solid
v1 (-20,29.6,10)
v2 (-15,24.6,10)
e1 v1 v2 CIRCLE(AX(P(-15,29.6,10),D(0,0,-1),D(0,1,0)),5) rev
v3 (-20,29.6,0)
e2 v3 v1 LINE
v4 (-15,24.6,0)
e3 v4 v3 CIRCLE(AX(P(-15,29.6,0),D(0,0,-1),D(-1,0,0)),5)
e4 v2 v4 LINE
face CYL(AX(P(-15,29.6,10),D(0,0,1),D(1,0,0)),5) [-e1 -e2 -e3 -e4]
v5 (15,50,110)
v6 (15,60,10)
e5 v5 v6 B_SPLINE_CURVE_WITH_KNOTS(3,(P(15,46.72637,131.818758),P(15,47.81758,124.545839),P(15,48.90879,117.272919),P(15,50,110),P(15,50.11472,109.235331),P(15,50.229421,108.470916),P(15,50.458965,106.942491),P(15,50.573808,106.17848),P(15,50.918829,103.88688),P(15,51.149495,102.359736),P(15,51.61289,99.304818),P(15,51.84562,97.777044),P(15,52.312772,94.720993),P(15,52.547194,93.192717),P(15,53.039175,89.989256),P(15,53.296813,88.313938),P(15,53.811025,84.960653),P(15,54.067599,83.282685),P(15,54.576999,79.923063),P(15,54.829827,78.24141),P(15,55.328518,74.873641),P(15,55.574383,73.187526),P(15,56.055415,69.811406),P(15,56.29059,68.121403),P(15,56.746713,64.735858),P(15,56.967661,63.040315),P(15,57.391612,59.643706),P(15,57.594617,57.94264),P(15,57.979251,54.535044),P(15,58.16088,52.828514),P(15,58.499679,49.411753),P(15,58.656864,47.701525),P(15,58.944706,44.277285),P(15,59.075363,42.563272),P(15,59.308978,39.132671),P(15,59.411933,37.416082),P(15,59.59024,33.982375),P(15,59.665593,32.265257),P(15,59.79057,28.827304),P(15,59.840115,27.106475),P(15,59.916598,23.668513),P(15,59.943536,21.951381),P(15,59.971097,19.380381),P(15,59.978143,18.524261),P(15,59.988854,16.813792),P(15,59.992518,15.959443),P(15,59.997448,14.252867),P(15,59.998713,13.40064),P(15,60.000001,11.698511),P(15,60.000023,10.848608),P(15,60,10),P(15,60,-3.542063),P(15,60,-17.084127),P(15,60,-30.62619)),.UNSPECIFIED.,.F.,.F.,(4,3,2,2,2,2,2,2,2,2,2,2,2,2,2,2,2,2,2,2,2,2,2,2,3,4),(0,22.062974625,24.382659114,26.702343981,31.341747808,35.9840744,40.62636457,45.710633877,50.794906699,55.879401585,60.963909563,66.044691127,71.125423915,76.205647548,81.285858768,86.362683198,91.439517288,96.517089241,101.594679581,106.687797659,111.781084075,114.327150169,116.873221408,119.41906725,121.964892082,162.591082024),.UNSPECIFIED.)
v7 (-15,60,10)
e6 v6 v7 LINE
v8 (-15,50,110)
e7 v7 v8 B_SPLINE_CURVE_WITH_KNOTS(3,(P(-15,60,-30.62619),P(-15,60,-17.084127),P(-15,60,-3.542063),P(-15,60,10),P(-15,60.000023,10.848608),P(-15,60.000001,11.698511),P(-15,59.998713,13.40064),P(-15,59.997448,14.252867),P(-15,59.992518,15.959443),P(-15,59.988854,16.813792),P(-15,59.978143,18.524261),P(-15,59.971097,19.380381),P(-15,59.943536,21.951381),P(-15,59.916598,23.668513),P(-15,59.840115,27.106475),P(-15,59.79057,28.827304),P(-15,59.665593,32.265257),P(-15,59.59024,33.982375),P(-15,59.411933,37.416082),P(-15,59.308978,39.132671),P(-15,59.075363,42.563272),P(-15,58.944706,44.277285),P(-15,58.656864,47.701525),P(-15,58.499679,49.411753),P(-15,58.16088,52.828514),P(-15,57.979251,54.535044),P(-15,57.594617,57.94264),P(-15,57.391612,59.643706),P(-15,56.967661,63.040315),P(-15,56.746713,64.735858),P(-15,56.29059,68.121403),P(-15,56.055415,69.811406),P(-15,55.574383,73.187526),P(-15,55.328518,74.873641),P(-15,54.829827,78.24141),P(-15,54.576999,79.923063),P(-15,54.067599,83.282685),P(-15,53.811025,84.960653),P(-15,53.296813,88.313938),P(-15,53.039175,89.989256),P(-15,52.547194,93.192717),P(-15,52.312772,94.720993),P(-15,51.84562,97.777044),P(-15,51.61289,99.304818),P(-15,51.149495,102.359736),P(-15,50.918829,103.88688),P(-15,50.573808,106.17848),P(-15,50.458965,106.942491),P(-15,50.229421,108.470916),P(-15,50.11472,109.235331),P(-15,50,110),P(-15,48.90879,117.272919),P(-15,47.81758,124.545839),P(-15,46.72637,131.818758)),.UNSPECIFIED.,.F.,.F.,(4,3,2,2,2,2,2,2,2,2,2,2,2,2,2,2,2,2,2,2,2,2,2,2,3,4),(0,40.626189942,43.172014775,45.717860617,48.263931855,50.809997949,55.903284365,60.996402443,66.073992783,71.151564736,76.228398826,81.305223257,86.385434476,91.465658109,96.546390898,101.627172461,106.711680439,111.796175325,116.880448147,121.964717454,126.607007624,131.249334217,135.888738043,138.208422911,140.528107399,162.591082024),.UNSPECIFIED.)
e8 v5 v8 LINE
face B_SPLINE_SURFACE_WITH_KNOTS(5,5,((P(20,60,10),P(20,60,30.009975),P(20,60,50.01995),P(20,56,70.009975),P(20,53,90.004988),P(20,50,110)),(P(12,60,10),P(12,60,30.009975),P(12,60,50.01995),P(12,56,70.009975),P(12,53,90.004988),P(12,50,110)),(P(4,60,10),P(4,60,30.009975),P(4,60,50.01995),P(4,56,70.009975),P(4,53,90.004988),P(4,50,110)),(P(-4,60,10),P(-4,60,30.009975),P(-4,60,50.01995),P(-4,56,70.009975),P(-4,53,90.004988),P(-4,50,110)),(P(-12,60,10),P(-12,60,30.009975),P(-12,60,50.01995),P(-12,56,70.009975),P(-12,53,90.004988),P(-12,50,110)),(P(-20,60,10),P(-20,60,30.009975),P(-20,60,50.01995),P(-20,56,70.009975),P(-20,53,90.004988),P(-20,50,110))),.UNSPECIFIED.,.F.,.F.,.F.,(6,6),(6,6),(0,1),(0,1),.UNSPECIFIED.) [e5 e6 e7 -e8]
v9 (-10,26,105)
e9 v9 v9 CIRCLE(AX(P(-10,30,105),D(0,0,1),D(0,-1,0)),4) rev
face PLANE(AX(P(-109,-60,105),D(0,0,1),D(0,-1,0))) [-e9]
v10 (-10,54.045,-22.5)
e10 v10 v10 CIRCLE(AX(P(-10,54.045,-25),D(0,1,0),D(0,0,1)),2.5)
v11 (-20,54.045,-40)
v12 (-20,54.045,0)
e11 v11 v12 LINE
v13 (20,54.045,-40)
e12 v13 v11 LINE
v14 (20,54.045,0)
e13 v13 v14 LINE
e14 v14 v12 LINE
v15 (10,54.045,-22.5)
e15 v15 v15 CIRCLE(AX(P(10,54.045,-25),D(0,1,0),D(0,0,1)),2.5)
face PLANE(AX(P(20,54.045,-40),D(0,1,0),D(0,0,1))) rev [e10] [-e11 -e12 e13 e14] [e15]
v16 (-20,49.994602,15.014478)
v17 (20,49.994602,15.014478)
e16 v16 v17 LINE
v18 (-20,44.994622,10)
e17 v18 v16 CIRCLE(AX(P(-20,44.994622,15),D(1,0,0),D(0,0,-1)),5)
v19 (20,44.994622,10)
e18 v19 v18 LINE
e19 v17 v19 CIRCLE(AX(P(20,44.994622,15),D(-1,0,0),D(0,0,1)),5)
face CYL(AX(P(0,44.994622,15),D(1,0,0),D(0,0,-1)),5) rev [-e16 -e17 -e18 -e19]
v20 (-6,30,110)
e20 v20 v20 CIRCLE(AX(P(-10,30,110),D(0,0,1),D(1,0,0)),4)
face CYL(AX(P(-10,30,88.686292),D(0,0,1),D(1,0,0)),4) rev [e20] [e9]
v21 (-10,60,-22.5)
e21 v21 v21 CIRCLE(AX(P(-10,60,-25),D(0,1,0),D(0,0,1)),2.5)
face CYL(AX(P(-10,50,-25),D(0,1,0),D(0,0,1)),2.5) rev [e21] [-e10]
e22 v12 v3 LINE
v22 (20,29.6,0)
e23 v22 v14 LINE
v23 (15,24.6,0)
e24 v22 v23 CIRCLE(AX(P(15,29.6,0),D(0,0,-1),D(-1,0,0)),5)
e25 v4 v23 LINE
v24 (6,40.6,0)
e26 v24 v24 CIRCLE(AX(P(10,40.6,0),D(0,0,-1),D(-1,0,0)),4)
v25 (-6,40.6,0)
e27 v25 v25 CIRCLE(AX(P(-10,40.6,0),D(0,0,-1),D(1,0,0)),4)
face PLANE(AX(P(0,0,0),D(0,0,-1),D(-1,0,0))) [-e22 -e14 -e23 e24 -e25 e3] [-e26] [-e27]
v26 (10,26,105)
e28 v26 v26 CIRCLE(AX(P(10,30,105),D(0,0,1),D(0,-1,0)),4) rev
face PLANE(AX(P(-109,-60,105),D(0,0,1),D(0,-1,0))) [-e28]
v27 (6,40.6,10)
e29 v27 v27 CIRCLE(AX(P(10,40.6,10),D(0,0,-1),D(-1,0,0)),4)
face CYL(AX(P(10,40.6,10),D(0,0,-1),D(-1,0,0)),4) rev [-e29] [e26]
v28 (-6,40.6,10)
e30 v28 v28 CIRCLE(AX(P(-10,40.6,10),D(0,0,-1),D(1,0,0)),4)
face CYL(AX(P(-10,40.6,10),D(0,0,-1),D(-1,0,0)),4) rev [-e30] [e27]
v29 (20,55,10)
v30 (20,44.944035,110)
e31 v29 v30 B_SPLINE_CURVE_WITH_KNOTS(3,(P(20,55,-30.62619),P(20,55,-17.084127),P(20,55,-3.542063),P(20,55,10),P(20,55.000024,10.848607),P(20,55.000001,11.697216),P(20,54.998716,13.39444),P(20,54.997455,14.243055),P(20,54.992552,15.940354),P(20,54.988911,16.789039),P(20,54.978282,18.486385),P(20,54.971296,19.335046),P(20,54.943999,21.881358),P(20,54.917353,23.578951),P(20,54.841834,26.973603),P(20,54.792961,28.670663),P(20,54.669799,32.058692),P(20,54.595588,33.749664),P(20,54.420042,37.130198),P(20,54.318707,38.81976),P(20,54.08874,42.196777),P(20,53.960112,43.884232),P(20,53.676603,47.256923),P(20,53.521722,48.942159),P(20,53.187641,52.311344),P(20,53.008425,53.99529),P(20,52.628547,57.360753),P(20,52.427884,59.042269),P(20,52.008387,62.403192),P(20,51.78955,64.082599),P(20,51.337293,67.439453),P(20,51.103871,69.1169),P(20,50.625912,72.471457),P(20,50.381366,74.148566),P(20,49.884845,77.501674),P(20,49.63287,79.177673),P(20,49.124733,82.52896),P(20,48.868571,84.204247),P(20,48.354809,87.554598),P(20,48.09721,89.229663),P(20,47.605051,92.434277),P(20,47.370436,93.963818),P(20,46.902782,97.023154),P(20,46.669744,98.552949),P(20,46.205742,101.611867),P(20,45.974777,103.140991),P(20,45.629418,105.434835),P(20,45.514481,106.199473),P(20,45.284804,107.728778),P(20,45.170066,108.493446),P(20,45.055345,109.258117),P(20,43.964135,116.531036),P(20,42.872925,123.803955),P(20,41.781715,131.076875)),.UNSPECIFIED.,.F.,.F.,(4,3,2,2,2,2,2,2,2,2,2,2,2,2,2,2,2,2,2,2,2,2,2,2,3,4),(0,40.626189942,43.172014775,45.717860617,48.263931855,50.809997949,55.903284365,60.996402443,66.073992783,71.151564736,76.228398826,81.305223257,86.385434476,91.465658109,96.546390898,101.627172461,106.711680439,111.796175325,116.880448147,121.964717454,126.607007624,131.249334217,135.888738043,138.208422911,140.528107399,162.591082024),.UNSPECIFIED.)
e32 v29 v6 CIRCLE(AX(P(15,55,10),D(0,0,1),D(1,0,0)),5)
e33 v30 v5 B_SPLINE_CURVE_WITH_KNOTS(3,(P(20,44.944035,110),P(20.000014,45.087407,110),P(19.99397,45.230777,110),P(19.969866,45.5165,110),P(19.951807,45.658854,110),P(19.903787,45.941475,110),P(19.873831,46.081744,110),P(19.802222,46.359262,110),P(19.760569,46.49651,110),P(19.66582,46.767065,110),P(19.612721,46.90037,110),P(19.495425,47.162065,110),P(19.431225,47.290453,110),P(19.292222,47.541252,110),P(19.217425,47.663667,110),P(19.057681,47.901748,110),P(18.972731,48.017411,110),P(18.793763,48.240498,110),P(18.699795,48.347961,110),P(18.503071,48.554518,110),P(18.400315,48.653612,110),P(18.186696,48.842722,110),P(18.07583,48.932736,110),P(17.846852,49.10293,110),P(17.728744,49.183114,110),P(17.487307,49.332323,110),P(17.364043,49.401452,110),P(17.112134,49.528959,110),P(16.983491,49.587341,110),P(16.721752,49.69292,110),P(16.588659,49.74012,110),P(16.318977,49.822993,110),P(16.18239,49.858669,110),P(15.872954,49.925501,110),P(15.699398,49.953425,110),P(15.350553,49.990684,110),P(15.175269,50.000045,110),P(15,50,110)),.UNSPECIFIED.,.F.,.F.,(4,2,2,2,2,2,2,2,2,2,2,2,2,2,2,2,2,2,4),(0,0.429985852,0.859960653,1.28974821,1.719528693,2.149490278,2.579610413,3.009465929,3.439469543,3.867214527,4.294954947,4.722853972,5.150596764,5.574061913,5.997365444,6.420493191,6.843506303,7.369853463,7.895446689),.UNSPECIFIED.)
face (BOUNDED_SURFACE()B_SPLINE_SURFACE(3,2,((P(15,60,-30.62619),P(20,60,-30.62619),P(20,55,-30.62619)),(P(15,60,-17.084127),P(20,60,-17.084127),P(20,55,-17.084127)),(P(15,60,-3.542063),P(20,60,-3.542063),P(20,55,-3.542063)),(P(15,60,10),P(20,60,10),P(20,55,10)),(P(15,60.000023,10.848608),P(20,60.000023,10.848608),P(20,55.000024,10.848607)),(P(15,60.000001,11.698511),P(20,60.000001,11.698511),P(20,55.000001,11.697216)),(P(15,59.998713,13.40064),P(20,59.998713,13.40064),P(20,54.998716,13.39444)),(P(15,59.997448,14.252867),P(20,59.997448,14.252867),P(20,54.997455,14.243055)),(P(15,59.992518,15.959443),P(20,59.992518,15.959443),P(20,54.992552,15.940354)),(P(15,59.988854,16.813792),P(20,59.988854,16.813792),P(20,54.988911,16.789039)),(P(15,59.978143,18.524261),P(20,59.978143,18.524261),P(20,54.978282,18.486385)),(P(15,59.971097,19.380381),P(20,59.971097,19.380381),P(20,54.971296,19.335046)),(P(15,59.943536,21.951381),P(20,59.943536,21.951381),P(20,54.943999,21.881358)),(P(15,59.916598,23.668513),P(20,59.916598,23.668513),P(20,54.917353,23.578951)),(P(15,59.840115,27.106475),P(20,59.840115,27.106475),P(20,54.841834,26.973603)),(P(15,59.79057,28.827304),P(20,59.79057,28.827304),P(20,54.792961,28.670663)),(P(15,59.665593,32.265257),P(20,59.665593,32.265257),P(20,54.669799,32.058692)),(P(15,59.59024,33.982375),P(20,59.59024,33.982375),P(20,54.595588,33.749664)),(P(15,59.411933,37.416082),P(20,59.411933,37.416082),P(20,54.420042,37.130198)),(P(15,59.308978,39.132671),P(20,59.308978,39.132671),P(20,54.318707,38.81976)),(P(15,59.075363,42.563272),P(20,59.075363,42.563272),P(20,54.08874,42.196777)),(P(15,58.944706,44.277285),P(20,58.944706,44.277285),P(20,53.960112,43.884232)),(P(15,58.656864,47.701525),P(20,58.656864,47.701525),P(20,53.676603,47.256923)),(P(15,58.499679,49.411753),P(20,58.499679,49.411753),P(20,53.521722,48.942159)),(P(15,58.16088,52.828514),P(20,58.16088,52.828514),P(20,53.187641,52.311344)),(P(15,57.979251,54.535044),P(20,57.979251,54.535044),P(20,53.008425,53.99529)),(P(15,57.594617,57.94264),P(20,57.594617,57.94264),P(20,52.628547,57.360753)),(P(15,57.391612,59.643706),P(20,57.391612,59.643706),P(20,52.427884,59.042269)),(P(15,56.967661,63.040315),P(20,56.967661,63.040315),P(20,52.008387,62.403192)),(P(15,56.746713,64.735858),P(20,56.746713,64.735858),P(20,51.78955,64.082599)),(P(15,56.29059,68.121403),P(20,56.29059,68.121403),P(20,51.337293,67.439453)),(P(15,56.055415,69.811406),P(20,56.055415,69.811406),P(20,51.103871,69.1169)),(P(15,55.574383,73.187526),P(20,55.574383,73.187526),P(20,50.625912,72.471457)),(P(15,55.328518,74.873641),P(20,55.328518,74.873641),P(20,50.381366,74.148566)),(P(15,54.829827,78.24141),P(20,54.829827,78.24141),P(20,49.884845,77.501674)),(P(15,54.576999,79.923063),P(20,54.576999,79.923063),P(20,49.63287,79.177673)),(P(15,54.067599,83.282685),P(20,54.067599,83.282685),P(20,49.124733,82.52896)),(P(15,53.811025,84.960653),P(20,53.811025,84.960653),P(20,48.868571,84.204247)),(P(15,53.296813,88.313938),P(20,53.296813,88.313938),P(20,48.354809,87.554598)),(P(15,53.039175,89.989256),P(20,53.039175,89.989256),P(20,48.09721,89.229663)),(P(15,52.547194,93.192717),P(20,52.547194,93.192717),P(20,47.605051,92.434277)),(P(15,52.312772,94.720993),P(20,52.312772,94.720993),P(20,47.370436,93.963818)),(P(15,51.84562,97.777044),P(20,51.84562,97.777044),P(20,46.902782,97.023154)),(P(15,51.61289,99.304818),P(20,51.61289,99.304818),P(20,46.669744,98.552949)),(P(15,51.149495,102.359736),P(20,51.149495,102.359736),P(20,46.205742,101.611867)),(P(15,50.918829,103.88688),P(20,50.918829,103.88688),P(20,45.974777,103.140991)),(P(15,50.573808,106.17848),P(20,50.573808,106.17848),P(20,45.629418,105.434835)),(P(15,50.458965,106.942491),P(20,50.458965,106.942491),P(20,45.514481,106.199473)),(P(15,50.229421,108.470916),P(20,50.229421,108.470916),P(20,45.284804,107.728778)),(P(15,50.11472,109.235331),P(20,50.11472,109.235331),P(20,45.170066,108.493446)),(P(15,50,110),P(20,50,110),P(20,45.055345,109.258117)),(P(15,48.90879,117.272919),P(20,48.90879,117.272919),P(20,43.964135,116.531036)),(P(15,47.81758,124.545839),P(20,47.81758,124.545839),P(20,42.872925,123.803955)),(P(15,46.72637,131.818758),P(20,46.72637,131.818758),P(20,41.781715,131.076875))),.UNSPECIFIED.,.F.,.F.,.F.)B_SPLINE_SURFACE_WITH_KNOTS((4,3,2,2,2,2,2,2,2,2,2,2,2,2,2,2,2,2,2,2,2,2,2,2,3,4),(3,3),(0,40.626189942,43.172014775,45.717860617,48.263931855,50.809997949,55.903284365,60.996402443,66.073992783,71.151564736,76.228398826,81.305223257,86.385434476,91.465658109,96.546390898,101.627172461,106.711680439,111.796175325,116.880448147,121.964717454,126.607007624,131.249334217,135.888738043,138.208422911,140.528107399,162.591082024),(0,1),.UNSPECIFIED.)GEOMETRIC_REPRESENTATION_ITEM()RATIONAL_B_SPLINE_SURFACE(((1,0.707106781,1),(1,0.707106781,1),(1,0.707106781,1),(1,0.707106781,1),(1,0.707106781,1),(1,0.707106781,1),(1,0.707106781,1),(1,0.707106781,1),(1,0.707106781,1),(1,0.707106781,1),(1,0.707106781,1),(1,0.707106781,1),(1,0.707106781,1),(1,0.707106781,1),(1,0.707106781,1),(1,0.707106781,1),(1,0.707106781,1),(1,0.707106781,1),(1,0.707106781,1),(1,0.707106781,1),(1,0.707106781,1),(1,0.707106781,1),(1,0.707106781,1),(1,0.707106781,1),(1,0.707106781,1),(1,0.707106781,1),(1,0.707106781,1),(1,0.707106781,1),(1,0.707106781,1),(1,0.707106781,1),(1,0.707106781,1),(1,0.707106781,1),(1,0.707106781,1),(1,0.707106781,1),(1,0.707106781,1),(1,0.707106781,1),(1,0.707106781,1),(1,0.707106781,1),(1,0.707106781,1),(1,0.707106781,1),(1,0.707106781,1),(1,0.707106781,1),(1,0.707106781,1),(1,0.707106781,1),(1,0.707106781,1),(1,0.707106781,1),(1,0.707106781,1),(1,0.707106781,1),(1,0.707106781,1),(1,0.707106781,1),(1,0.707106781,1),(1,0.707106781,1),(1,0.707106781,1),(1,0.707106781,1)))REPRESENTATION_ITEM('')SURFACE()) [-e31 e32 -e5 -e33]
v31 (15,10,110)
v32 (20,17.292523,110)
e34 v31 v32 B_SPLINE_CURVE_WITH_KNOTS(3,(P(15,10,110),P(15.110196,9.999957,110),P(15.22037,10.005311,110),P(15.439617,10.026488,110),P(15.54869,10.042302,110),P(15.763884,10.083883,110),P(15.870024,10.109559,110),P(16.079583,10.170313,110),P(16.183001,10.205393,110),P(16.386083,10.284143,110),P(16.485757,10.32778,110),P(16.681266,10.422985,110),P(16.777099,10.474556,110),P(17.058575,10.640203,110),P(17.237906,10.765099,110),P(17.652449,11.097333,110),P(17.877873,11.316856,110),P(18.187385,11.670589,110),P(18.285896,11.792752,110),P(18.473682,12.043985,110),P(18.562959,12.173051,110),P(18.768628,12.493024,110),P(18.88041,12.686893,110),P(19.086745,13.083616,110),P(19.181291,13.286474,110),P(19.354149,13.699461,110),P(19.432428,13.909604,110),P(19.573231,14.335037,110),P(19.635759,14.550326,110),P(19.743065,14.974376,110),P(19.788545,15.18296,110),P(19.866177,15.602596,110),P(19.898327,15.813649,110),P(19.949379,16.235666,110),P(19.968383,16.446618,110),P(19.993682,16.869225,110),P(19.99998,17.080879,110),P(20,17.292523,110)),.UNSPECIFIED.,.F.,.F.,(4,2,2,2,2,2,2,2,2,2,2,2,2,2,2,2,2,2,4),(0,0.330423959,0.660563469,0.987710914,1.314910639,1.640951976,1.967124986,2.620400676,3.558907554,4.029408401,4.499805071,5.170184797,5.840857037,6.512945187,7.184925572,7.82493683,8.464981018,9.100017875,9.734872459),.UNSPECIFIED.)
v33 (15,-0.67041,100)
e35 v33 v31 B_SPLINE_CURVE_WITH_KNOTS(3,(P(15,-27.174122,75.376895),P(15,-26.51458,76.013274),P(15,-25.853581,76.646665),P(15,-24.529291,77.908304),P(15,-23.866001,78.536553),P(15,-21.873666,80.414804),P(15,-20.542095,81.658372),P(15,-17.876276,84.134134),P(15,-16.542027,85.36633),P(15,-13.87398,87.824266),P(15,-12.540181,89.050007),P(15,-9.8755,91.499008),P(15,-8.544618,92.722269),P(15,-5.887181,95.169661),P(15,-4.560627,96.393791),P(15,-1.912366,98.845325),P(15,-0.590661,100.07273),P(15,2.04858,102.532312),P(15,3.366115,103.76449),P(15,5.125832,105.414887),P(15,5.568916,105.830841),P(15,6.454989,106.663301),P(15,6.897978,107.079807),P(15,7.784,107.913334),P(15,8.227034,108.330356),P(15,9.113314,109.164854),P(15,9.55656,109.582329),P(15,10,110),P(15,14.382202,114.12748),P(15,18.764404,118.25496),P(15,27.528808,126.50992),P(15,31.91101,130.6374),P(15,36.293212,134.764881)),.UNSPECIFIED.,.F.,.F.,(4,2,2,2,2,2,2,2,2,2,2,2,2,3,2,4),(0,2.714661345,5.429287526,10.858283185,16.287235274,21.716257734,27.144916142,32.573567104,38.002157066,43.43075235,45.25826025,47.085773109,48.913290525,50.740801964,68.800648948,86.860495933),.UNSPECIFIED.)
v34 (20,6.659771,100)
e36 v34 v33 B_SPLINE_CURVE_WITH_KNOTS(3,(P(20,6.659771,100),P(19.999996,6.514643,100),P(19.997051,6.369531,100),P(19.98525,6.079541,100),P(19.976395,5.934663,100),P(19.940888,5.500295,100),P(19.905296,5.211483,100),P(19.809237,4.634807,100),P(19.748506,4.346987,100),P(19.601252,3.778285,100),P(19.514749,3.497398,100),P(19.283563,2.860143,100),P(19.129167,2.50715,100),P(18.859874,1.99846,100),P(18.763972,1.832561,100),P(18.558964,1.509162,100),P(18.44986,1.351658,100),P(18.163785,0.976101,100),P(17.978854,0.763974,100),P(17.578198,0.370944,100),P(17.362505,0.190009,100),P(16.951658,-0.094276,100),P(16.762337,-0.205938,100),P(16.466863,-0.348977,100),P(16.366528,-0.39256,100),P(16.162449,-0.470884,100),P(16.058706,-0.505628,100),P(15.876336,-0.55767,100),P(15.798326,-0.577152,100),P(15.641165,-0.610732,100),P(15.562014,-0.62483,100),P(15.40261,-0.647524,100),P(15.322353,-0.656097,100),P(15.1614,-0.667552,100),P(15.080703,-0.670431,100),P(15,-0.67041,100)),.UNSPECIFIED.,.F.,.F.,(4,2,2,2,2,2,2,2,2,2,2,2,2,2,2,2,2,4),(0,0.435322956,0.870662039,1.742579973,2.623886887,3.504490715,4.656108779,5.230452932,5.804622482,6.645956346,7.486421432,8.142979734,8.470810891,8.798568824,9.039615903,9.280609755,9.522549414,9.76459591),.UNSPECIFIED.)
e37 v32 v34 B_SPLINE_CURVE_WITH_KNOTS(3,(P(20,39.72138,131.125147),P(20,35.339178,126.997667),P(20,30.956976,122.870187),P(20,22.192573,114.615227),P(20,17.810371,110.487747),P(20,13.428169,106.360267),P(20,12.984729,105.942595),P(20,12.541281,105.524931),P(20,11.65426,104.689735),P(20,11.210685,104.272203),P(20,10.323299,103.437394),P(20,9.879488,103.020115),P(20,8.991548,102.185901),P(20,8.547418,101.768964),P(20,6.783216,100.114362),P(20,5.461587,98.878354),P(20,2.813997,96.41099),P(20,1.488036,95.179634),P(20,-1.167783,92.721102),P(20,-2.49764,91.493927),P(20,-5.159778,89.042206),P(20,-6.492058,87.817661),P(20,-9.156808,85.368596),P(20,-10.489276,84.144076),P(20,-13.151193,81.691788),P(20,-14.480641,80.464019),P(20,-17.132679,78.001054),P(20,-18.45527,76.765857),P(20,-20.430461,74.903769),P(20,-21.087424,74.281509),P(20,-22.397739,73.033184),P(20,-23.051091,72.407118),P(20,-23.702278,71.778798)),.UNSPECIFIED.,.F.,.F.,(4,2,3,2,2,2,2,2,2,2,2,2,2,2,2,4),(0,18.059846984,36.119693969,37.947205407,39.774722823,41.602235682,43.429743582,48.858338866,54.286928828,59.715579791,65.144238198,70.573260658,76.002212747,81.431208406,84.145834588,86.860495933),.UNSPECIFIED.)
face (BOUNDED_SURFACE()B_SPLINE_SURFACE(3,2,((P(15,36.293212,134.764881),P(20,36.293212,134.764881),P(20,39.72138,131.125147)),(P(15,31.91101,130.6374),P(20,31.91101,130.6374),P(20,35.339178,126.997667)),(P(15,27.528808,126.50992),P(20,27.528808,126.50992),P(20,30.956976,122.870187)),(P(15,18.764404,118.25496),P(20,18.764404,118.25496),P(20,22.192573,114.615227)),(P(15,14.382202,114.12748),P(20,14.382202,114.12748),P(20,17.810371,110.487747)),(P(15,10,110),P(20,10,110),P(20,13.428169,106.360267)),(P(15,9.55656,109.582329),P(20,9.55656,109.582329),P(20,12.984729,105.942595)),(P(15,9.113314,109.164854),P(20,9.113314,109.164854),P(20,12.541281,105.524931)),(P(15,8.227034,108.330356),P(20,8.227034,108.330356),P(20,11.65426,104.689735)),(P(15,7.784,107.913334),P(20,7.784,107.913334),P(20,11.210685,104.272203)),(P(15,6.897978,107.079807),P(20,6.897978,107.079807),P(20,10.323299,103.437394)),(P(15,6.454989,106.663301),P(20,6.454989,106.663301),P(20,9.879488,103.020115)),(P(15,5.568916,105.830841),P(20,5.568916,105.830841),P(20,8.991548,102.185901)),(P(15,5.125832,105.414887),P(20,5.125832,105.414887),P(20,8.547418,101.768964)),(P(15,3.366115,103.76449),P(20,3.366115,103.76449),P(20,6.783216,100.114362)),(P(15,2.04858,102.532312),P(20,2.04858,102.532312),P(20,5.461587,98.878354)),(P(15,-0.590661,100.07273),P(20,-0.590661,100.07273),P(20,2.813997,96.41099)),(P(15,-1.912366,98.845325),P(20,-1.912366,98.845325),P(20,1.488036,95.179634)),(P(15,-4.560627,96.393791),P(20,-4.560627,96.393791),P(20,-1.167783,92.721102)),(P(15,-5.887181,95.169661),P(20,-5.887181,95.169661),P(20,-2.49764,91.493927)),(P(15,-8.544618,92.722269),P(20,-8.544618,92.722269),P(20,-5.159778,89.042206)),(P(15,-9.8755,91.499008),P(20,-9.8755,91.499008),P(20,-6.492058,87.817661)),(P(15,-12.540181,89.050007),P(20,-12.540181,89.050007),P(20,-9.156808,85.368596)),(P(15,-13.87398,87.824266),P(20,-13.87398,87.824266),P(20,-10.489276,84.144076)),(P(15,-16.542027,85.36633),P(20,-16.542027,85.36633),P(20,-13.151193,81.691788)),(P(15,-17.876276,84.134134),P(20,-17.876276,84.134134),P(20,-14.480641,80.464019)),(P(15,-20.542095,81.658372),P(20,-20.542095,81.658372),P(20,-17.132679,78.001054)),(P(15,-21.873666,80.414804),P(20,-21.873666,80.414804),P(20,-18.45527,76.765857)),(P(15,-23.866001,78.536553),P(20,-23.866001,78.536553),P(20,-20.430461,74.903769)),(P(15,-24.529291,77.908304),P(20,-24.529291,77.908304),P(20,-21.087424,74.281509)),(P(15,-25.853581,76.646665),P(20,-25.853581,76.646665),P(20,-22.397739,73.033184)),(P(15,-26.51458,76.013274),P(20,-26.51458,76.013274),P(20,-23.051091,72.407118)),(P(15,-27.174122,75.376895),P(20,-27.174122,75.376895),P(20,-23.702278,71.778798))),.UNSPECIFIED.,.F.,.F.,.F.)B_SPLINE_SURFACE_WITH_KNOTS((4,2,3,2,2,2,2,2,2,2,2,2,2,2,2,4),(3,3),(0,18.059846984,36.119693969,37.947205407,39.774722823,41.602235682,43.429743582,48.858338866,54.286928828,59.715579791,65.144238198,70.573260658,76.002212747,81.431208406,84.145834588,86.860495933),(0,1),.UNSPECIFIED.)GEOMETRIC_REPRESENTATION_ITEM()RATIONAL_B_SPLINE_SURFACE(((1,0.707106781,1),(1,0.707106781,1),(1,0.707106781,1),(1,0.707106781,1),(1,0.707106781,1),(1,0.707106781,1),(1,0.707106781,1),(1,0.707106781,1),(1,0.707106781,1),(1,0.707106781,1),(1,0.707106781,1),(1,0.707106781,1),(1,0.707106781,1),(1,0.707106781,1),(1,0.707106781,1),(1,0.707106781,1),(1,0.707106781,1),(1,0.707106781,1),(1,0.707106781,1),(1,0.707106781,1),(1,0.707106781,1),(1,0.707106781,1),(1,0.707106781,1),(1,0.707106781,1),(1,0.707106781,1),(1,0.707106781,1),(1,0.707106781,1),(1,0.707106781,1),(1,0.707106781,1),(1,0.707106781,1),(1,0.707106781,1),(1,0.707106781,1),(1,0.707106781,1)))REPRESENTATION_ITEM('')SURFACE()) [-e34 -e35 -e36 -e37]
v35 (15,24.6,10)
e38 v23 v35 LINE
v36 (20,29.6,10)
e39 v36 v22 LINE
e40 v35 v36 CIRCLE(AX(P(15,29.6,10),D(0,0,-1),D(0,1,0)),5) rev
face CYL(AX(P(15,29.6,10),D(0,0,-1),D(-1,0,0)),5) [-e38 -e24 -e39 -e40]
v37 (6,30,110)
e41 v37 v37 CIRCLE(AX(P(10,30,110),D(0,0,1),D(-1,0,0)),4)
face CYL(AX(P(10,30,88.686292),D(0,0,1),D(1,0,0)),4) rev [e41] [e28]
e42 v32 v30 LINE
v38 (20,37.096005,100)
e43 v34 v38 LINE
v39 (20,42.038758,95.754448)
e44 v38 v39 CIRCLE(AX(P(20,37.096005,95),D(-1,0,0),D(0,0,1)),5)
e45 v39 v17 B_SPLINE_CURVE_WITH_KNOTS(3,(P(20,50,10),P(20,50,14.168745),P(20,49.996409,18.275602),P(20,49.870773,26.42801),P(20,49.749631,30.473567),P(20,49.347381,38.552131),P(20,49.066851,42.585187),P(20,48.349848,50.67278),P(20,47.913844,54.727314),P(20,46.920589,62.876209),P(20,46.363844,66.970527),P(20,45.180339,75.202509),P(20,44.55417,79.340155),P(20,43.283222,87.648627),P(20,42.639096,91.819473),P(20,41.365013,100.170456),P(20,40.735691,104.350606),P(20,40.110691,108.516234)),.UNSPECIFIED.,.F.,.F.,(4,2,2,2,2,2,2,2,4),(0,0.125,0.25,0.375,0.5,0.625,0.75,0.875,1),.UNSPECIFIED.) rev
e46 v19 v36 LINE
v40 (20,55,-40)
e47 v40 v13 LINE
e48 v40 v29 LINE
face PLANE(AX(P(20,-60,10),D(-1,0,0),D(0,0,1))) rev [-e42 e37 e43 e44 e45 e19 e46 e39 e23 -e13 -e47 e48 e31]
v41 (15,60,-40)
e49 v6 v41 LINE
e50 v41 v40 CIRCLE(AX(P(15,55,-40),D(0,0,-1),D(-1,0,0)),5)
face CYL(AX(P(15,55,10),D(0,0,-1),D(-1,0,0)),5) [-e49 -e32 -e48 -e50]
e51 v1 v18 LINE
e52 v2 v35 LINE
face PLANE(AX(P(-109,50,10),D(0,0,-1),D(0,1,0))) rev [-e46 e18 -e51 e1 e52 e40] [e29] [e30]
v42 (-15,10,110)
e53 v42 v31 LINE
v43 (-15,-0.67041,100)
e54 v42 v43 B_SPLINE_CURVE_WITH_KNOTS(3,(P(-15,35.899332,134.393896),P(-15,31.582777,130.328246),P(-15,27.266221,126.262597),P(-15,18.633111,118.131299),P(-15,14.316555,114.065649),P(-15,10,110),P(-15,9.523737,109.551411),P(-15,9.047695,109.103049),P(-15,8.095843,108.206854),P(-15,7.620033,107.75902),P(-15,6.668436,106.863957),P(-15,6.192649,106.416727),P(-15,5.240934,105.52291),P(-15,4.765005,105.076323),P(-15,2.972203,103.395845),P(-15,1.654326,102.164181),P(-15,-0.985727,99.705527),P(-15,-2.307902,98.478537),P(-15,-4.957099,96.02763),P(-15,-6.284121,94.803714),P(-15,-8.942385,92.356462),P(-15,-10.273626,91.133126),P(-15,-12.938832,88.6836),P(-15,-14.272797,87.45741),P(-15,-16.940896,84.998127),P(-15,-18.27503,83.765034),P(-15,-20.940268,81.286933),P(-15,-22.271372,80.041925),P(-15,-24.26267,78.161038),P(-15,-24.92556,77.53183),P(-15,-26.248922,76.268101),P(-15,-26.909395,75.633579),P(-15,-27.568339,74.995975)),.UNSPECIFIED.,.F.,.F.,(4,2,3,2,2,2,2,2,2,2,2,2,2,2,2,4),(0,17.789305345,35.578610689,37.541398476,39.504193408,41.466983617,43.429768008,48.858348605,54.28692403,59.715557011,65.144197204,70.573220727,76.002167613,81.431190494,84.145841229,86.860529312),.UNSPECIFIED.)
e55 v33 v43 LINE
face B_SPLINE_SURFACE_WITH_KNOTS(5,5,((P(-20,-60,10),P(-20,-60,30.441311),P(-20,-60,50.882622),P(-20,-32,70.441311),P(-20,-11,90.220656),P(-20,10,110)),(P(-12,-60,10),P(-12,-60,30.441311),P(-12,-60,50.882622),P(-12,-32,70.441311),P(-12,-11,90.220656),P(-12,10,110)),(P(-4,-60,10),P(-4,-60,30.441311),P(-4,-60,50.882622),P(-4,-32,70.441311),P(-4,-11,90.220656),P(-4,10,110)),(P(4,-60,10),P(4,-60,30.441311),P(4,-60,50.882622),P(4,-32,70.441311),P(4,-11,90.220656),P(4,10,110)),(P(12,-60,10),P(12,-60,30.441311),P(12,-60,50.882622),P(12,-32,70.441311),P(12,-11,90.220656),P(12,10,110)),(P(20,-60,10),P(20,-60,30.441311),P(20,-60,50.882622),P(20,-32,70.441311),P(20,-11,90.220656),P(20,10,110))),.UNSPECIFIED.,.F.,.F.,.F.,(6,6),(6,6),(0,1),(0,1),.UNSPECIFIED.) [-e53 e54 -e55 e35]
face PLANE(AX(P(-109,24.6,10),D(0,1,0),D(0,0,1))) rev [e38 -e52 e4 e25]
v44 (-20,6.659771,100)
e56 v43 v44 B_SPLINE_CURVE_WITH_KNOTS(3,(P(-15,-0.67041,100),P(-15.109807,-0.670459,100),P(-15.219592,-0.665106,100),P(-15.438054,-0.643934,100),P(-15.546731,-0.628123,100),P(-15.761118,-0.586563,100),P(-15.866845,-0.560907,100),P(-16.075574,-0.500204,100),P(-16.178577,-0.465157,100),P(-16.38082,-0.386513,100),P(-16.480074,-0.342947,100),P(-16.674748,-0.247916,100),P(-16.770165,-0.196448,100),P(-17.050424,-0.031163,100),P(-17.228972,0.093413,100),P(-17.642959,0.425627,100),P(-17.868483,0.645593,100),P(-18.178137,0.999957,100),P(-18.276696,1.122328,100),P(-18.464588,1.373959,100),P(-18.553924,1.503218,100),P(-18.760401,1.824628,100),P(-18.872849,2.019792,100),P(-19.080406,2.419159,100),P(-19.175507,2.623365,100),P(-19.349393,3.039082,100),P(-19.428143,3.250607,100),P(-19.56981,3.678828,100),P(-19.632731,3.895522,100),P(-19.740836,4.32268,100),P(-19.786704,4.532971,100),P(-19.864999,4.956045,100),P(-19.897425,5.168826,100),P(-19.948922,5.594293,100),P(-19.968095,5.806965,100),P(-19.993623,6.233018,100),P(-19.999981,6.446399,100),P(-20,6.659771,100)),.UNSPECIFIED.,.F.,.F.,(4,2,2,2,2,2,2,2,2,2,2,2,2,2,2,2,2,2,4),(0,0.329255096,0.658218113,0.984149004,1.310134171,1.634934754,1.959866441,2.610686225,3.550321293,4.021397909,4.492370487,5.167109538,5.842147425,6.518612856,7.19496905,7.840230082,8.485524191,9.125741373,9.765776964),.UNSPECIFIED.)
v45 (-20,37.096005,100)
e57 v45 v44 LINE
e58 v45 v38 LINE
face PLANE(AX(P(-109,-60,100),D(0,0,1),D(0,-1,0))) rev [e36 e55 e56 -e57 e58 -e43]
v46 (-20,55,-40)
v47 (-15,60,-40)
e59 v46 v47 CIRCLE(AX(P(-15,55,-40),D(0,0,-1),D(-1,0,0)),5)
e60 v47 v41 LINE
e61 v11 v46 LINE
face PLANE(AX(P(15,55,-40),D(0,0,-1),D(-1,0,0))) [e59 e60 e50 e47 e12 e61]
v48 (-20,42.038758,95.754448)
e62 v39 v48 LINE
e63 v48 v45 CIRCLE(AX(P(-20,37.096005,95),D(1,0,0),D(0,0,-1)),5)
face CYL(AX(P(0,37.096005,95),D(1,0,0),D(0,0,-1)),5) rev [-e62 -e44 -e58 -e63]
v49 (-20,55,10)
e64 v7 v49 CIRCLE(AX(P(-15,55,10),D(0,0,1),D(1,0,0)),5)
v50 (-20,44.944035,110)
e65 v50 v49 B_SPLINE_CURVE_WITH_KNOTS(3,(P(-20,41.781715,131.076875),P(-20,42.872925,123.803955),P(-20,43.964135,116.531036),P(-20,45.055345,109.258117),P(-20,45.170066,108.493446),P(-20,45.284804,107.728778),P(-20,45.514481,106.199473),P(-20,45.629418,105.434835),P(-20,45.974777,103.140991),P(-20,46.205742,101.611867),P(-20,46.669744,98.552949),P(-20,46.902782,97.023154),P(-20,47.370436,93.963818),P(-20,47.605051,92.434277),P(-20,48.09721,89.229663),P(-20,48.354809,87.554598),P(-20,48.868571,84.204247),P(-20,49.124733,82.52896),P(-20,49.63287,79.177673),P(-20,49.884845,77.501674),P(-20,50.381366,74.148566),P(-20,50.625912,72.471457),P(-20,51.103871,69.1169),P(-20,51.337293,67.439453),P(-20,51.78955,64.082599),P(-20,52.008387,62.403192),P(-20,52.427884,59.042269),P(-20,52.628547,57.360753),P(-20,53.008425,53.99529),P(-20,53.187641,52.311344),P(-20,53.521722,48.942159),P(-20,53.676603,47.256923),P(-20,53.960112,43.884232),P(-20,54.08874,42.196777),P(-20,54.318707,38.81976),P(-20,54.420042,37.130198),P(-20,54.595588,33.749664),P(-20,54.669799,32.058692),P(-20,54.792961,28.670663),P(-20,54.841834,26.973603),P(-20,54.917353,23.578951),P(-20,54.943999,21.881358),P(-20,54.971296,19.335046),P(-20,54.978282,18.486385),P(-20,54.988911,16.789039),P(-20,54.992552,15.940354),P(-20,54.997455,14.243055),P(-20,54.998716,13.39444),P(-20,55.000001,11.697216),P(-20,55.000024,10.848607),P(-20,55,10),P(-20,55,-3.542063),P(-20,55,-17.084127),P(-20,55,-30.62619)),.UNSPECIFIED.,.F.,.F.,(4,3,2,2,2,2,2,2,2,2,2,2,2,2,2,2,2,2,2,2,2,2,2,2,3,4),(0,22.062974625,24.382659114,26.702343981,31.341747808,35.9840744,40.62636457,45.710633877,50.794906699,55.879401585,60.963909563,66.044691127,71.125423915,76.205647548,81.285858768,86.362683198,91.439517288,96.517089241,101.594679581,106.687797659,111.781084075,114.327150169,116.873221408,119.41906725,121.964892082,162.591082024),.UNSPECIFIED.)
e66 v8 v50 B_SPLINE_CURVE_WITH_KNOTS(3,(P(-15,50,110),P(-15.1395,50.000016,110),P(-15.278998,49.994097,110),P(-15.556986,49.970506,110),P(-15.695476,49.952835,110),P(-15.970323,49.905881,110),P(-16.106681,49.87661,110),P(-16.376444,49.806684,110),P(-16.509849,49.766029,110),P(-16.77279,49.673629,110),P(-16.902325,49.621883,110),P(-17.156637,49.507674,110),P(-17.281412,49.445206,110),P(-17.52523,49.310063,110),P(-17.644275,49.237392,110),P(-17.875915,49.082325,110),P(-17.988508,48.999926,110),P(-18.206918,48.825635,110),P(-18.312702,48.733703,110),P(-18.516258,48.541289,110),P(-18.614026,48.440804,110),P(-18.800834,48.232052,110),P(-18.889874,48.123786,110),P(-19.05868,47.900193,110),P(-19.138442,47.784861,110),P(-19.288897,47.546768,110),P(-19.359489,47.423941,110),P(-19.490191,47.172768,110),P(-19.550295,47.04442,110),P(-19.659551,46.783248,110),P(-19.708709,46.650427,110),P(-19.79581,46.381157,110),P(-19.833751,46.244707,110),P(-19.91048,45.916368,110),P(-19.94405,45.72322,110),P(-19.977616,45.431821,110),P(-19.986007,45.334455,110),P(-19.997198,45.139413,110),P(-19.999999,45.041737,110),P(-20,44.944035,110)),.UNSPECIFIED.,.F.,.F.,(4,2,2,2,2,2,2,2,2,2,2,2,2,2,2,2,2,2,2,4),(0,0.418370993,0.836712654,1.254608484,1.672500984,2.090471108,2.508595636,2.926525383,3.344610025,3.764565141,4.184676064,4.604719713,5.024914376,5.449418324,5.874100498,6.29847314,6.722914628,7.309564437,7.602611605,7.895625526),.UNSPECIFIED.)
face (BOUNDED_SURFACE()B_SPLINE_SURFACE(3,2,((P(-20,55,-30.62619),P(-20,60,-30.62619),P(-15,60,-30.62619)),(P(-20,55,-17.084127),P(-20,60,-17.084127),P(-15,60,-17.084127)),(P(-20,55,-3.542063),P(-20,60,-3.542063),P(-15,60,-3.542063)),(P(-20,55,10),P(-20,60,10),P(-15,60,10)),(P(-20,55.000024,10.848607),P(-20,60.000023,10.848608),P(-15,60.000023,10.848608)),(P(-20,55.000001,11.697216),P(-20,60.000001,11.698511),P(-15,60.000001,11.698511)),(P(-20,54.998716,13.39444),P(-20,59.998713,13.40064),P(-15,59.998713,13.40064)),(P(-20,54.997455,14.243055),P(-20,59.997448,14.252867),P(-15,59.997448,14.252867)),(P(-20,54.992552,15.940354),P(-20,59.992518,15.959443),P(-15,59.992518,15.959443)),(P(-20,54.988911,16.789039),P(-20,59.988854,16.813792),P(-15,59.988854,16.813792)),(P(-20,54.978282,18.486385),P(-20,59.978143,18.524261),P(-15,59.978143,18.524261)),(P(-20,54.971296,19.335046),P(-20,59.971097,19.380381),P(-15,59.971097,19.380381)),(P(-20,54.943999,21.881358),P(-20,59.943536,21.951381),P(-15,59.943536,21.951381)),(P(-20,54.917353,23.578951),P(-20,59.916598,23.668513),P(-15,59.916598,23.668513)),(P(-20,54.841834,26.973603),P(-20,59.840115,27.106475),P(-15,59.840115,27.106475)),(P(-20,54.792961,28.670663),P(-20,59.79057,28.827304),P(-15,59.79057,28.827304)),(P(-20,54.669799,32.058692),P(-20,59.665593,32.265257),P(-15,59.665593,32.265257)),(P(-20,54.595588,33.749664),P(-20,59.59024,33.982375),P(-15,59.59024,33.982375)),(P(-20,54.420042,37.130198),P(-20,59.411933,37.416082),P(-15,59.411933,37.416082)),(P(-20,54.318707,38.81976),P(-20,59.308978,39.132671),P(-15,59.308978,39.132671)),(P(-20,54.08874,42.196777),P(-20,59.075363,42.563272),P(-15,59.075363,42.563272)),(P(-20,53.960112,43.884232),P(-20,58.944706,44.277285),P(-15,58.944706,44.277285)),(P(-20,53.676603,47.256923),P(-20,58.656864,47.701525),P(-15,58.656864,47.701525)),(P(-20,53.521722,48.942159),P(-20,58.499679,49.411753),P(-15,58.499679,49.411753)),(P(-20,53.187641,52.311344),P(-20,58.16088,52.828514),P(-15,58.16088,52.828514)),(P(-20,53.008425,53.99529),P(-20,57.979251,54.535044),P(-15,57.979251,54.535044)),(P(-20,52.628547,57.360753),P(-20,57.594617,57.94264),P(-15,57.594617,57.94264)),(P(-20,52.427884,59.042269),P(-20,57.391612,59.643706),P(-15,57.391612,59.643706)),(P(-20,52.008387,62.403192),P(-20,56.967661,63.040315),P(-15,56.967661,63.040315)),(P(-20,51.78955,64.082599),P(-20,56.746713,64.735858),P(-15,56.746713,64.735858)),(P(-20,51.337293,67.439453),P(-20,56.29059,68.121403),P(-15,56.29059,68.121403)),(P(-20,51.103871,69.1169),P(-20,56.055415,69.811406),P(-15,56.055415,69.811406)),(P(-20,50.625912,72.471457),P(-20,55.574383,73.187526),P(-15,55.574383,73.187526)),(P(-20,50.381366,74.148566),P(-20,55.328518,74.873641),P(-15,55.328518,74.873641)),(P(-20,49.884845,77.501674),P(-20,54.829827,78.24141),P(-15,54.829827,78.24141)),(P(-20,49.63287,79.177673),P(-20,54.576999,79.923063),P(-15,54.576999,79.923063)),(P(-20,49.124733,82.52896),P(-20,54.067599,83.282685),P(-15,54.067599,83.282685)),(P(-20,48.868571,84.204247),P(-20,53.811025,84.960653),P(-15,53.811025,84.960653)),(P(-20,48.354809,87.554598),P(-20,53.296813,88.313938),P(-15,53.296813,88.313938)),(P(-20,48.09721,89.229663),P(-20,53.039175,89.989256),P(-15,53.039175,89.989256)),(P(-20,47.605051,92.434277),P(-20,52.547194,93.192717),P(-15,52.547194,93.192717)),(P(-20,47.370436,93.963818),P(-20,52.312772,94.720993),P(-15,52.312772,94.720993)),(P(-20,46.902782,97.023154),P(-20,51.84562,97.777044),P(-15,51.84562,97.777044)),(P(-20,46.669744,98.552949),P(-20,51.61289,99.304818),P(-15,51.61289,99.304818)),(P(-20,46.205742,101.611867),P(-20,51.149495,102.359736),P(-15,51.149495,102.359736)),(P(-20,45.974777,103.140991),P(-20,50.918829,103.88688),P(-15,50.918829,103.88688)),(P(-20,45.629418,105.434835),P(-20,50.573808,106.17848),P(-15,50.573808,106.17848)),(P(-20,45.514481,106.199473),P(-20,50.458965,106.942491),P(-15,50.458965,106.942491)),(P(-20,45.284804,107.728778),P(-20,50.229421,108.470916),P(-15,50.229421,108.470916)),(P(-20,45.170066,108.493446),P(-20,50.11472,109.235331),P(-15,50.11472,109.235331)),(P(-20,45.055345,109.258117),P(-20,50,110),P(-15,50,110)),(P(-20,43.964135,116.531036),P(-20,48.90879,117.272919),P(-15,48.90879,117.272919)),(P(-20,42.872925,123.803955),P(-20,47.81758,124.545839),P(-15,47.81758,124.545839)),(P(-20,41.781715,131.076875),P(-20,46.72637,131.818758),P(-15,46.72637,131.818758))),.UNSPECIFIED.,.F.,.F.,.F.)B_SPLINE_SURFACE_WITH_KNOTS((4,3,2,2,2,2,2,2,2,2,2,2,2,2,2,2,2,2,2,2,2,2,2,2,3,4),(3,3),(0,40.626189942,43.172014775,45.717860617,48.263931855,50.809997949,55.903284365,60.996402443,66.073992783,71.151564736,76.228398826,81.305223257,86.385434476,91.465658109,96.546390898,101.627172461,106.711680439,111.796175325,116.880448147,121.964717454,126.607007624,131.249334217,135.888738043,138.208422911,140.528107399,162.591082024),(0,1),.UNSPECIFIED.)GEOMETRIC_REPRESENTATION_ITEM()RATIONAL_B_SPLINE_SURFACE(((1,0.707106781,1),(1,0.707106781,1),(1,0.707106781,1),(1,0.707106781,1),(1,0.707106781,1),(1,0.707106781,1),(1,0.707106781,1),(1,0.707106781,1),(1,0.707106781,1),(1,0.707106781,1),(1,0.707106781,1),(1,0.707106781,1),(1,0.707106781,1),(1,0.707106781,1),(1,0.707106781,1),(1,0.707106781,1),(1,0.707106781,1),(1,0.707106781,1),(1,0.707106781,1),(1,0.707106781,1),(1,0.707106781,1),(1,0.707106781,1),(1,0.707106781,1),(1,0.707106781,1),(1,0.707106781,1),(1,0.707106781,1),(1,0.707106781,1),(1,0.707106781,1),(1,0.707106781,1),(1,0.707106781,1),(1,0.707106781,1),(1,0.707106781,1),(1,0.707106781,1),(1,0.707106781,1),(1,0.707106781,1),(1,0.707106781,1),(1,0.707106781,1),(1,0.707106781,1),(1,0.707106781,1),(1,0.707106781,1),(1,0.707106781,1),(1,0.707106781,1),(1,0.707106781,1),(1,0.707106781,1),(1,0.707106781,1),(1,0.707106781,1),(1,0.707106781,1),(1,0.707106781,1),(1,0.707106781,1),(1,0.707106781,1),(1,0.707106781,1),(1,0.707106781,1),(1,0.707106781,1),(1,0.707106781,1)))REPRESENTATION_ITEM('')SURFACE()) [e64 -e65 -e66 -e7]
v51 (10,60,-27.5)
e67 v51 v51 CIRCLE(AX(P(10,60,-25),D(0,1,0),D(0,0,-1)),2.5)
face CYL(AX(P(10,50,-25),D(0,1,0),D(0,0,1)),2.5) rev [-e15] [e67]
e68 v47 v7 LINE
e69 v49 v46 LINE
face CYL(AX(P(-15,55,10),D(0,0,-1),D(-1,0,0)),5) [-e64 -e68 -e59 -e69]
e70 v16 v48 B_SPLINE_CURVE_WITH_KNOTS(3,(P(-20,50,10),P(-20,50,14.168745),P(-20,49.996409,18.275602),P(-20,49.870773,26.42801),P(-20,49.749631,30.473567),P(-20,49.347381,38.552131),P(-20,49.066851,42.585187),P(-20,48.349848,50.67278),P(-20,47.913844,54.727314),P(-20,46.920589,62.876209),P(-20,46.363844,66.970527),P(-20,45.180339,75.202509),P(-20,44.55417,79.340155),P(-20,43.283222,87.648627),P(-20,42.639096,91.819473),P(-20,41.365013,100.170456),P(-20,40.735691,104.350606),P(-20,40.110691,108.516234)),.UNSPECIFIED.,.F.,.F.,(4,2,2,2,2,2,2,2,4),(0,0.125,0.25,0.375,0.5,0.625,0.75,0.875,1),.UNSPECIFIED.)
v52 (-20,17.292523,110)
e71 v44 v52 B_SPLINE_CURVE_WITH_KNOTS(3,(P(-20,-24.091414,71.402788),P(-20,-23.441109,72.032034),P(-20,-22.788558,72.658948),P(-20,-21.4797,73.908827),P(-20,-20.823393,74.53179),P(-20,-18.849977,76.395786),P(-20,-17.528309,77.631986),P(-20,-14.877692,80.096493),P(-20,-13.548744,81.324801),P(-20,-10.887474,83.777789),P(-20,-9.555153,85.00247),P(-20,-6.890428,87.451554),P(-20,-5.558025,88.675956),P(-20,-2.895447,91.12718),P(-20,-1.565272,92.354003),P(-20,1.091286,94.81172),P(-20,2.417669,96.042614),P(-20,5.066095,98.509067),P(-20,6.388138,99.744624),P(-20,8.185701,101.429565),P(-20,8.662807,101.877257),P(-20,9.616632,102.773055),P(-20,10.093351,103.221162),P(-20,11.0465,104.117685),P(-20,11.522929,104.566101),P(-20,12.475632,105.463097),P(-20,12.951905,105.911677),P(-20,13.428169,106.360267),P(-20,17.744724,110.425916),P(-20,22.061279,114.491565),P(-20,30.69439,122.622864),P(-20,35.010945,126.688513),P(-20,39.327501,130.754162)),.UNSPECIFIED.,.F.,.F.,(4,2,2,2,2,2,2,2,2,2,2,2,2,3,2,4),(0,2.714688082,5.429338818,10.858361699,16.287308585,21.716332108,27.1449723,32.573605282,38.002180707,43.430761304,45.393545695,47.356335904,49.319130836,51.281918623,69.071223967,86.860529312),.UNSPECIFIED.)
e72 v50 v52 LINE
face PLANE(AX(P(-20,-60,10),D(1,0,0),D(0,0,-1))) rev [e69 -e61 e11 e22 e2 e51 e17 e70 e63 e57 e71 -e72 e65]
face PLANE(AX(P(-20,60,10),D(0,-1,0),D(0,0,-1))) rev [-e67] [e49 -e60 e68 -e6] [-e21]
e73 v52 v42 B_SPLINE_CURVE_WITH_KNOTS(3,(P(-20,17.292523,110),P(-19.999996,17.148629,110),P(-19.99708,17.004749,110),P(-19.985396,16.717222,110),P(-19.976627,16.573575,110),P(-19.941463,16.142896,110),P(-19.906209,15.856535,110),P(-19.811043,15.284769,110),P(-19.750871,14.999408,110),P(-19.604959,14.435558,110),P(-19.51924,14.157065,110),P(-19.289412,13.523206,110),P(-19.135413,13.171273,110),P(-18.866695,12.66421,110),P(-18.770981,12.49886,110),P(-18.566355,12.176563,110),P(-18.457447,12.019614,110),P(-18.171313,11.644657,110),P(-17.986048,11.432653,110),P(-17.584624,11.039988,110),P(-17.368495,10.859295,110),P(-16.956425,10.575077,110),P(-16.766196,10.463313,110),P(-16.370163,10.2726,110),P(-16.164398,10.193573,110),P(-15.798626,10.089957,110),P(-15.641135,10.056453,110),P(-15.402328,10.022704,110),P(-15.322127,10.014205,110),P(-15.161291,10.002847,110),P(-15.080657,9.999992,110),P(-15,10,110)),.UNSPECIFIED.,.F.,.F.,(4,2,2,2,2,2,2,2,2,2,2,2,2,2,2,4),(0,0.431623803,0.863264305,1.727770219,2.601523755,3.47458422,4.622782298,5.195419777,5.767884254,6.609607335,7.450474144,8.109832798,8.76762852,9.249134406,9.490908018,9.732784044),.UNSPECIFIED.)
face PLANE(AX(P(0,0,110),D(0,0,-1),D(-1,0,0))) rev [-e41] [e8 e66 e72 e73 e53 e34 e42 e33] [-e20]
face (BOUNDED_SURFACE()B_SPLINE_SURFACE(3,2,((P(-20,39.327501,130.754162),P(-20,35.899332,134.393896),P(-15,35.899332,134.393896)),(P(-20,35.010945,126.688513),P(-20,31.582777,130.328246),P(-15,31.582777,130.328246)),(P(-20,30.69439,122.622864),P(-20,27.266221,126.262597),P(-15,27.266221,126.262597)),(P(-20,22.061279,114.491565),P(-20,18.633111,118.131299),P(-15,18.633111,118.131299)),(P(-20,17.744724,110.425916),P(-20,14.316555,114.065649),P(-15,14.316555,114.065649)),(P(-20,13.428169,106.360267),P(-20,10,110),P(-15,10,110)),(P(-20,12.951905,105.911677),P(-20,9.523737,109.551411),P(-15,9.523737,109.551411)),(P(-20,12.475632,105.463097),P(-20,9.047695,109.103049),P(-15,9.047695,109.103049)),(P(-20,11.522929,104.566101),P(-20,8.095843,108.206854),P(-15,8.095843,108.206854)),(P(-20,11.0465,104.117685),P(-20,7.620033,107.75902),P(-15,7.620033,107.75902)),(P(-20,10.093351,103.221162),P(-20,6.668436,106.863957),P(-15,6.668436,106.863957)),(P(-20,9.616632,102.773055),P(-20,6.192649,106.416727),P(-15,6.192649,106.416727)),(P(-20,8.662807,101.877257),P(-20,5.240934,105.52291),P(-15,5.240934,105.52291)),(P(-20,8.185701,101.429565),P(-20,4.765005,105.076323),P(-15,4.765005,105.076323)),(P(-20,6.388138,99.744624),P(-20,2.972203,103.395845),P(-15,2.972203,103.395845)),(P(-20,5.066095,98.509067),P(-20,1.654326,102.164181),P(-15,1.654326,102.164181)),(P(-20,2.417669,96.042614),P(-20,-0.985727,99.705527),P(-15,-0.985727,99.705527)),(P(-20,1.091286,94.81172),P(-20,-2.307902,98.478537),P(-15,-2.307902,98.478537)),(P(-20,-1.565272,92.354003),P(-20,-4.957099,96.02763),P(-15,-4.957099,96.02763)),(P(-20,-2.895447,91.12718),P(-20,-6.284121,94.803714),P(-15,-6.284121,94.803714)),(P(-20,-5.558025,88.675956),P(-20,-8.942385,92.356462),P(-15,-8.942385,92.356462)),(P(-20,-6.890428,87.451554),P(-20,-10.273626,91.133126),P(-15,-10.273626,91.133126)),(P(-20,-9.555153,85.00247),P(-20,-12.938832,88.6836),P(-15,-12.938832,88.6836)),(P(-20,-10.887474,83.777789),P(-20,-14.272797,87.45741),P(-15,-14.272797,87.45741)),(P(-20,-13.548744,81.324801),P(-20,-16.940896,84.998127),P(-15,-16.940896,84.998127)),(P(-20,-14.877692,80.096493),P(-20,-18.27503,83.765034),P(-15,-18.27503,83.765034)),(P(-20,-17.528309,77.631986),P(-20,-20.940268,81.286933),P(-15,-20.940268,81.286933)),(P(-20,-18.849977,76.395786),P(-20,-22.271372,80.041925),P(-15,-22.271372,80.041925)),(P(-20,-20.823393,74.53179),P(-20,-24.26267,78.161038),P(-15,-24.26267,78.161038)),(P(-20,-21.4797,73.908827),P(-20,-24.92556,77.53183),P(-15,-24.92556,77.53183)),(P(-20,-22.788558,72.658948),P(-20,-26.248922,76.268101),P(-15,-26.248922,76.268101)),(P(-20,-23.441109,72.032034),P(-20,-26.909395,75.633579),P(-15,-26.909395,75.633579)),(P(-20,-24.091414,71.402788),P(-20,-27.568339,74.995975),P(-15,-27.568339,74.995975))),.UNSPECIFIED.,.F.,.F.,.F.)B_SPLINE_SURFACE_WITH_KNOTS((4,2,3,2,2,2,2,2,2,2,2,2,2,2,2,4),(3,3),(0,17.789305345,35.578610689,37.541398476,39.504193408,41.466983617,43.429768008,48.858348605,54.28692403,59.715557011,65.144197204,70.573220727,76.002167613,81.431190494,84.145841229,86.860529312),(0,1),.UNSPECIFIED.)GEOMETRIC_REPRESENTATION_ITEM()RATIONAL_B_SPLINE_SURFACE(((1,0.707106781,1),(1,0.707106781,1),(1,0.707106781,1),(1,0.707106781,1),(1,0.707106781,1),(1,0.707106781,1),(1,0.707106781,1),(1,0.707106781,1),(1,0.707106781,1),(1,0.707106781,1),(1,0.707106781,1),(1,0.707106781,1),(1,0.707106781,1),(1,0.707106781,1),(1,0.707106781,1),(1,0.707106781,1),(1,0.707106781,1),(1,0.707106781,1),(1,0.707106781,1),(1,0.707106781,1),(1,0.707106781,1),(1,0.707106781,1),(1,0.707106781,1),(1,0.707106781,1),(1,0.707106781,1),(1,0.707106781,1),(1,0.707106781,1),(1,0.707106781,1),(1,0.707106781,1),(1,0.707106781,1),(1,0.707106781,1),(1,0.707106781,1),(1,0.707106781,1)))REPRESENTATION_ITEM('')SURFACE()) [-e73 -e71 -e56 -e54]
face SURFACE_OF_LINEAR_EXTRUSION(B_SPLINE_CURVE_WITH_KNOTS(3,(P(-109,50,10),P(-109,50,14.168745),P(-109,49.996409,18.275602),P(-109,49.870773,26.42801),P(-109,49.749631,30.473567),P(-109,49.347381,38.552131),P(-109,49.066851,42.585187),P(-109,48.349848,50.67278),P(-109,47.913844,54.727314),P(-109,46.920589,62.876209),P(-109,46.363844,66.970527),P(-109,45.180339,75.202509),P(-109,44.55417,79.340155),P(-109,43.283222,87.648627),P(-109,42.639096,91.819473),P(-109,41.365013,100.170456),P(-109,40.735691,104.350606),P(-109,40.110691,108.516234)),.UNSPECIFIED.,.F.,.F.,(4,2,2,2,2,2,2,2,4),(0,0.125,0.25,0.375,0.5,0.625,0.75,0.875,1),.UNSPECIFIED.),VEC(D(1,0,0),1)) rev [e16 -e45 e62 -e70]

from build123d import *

# Parameters (mm, degrees)
SKETCH1_W           = 40
SKETCH1_H           = 120
BOSS_EXTRUDE1_DEPTH = 10
LOFT1_START         = -20
LOFT1_DEPTH         = 40
CUT_EXTRUDE2_DEPTH  = 109
FILLET2_R           = 5
SKETCH7_R           = 4
CUT_EXTRUDE3_DEPTH  = 5
SKETCH8_R           = 4
CUT_EXTRUDE4_DEPTH  = 10
FILLET4_R           = 5
BOSS_EXTRUDE3_DEPTH = 40
SKETCH10_R          = 2.5
CUT_EXTRUDE5_DEPTH  = 10


# Read off the part's stored shape, not the designer's step: Loft1
with BuildPart() as part:
    # Sketch1 → Boss-Extrude1 (new body)
    with BuildSketch(Plane.XY):
        Rectangle(SKETCH1_W, SKETCH1_H)
    extrude(amount=BOSS_EXTRUDE1_DEPTH)

    # Loft1 outline → Loft1 (add)
    with BuildSketch(Plane.YZ.offset(LOFT1_START)):
        with BuildLine():
            add(Edge.make_bspline(
                [(-60, 10), (-60, 30.441311123), (-60, 50.882622246), (-32, 70.441311123), (-11, 90.220655562), (10, 110)],
                knots=[0, 0, 0, 0, 0, 0, 1, 1, 1, 1, 1, 1], degree=5))
            Line((-60, 10), (60, 10))
            add(Edge.make_bspline(
                [(60, 10), (60, 30.009975124), (60, 50.019950248), (56, 70.009975124), (53, 90.004987562), (50, 110)],
                knots=[0, 0, 0, 0, 0, 0, 1, 1, 1, 1, 1, 1], degree=5))
            Line((50, 110), (10, 110))
        make_face()
    extrude(amount=LOFT1_DEPTH)

    # Sketch5 → Cut-Extrude2 (cut, symmetric)
    with BuildSketch(Plane(origin=(0, 0, 0), x_dir=(0, 0, -1), z_dir=(1, 0, 0))):
        with BuildLine():
            Line((0, -60), (-100, -60))
            Line((-100, -60), (-100, 41.393396846))
            add(Edge.make_bspline(
                [(-10, 50), (-14.168744818, 50), (-18.275601874, 49.996409138), (-26.428009759, 49.87077255), (-30.473567498, 49.749630948), (-38.552130932, 49.347381325), (-42.585186542, 49.066850503), (-50.67278015, 48.349847693), (-54.727313877, 47.913843652), (-62.876208691, 46.920588729), (-66.970526782, 46.363844017), (-75.202509115, 45.180338869), (-79.340154976, 44.554169827), (-87.648626866, 43.2832223), (-91.819473021, 42.639096286), (-97.329708937, 41.798417087), (-98.664929704, 41.595568065), (-100, 41.393396846)],
                knots=[0, 0, 0, 0, 0.125, 0.125, 0.25, 0.25, 0.375, 0.375, 0.5, 0.5, 0.625, 0.625, 0.75, 0.75, 0.875, 0.875, 0.914957714, 0.914957714, 0.914957714, 0.914957714], degree=3))
            Line((-10, 50), (-10, 24.6))
            Line((-10, 24.6), (0, 24.6))
            Line((0, 24.6), (0, -60))
        make_face()
    extrude(amount=CUT_EXTRUDE2_DEPTH, both=True, mode=Mode.SUBTRACT)

    # Fillet2
    fillet2_edges = [part.edges().sort_by_distance(p)[0] for p in [
        (20, 60, 5),
        (-20, 60, 5),
        (20, 4.6735266, 104.990679985),
        (-20, 4.6735266, 104.990679985),
        (-20, 57.319131326, 60.213292337),
        (20, 57.319131326, 60.213292337),
    ]]
    fillet(fillet2_edges, radius=FILLET2_R)

    # Sketch7 → Cut-Extrude3 (cut)
    with BuildSketch(Plane.XY.offset(110)):
        with Locations((-10, 30)):
            Circle(SKETCH7_R)
        with Locations(Location((10, 30, 0), (0, 0, 270))):
            Circle(SKETCH7_R)
        with Locations((10, -30)):
            Circle(SKETCH7_R)
        with Locations((-10, -30)):
            Circle(SKETCH7_R)
    extrude(amount=-CUT_EXTRUDE3_DEPTH, mode=Mode.SUBTRACT)

    # Sketch8 → Cut-Extrude4 (cut)
    with BuildSketch(Plane(origin=(0, 0, 0), x_dir=(-1, 0, 0), z_dir=(0, 0, -1))):
        with Locations((-10, 40.6)):
            Circle(SKETCH8_R)
        with Locations(Location((10, 40.6, 0), (0, 0, 180))):
            Circle(SKETCH8_R)
    extrude(amount=-CUT_EXTRUDE4_DEPTH, mode=Mode.SUBTRACT)

    # Fillet4
    fillet4_edges = [part.edges().sort_by_distance(p)[0] for p in [
        (-20, 24.6, 5),
        (20, 24.6, 5),
        (-10, 50, 10),
        (-10, 41.393396846, 100),
    ]]
    fillet(fillet4_edges, radius=FILLET4_R)

    # Sketch9 → Boss-Extrude3 (add)
    with BuildSketch(Plane(origin=(0, 0, 0), x_dir=(-1, 0, 0), z_dir=(0, 0, -1))):
        with BuildLine():
            Line((-20, 55), (-20, 54.045))
            Line((-20, 54.045), (20, 54.045))
            Line((20, 54.045), (20, 55))
            ThreePointArc((20, 55), (18.535533906, 58.535533906), (15, 60))
            Line((15, 60), (-15, 60))
            ThreePointArc((-15, 60), (-18.535533906, 58.535533906), (-20, 55))
        make_face()
    extrude(amount=BOSS_EXTRUDE3_DEPTH)

    # Sketch10 → Cut-Extrude5 (cut)
    with BuildSketch(Plane(origin=(0, 60, 0), x_dir=(1, 0, 0), z_dir=(0, 1, 0))):
        with Locations(Location((-10, 25, 0), (0, 0, 270))):
            Circle(SKETCH10_R)
        with Locations(Location((10, 25, 0), (0, 0, 270))):
            Circle(SKETCH10_R)
    extrude(amount=-CUT_EXTRUDE5_DEPTH, mode=Mode.SUBTRACT)


solid = part.part
